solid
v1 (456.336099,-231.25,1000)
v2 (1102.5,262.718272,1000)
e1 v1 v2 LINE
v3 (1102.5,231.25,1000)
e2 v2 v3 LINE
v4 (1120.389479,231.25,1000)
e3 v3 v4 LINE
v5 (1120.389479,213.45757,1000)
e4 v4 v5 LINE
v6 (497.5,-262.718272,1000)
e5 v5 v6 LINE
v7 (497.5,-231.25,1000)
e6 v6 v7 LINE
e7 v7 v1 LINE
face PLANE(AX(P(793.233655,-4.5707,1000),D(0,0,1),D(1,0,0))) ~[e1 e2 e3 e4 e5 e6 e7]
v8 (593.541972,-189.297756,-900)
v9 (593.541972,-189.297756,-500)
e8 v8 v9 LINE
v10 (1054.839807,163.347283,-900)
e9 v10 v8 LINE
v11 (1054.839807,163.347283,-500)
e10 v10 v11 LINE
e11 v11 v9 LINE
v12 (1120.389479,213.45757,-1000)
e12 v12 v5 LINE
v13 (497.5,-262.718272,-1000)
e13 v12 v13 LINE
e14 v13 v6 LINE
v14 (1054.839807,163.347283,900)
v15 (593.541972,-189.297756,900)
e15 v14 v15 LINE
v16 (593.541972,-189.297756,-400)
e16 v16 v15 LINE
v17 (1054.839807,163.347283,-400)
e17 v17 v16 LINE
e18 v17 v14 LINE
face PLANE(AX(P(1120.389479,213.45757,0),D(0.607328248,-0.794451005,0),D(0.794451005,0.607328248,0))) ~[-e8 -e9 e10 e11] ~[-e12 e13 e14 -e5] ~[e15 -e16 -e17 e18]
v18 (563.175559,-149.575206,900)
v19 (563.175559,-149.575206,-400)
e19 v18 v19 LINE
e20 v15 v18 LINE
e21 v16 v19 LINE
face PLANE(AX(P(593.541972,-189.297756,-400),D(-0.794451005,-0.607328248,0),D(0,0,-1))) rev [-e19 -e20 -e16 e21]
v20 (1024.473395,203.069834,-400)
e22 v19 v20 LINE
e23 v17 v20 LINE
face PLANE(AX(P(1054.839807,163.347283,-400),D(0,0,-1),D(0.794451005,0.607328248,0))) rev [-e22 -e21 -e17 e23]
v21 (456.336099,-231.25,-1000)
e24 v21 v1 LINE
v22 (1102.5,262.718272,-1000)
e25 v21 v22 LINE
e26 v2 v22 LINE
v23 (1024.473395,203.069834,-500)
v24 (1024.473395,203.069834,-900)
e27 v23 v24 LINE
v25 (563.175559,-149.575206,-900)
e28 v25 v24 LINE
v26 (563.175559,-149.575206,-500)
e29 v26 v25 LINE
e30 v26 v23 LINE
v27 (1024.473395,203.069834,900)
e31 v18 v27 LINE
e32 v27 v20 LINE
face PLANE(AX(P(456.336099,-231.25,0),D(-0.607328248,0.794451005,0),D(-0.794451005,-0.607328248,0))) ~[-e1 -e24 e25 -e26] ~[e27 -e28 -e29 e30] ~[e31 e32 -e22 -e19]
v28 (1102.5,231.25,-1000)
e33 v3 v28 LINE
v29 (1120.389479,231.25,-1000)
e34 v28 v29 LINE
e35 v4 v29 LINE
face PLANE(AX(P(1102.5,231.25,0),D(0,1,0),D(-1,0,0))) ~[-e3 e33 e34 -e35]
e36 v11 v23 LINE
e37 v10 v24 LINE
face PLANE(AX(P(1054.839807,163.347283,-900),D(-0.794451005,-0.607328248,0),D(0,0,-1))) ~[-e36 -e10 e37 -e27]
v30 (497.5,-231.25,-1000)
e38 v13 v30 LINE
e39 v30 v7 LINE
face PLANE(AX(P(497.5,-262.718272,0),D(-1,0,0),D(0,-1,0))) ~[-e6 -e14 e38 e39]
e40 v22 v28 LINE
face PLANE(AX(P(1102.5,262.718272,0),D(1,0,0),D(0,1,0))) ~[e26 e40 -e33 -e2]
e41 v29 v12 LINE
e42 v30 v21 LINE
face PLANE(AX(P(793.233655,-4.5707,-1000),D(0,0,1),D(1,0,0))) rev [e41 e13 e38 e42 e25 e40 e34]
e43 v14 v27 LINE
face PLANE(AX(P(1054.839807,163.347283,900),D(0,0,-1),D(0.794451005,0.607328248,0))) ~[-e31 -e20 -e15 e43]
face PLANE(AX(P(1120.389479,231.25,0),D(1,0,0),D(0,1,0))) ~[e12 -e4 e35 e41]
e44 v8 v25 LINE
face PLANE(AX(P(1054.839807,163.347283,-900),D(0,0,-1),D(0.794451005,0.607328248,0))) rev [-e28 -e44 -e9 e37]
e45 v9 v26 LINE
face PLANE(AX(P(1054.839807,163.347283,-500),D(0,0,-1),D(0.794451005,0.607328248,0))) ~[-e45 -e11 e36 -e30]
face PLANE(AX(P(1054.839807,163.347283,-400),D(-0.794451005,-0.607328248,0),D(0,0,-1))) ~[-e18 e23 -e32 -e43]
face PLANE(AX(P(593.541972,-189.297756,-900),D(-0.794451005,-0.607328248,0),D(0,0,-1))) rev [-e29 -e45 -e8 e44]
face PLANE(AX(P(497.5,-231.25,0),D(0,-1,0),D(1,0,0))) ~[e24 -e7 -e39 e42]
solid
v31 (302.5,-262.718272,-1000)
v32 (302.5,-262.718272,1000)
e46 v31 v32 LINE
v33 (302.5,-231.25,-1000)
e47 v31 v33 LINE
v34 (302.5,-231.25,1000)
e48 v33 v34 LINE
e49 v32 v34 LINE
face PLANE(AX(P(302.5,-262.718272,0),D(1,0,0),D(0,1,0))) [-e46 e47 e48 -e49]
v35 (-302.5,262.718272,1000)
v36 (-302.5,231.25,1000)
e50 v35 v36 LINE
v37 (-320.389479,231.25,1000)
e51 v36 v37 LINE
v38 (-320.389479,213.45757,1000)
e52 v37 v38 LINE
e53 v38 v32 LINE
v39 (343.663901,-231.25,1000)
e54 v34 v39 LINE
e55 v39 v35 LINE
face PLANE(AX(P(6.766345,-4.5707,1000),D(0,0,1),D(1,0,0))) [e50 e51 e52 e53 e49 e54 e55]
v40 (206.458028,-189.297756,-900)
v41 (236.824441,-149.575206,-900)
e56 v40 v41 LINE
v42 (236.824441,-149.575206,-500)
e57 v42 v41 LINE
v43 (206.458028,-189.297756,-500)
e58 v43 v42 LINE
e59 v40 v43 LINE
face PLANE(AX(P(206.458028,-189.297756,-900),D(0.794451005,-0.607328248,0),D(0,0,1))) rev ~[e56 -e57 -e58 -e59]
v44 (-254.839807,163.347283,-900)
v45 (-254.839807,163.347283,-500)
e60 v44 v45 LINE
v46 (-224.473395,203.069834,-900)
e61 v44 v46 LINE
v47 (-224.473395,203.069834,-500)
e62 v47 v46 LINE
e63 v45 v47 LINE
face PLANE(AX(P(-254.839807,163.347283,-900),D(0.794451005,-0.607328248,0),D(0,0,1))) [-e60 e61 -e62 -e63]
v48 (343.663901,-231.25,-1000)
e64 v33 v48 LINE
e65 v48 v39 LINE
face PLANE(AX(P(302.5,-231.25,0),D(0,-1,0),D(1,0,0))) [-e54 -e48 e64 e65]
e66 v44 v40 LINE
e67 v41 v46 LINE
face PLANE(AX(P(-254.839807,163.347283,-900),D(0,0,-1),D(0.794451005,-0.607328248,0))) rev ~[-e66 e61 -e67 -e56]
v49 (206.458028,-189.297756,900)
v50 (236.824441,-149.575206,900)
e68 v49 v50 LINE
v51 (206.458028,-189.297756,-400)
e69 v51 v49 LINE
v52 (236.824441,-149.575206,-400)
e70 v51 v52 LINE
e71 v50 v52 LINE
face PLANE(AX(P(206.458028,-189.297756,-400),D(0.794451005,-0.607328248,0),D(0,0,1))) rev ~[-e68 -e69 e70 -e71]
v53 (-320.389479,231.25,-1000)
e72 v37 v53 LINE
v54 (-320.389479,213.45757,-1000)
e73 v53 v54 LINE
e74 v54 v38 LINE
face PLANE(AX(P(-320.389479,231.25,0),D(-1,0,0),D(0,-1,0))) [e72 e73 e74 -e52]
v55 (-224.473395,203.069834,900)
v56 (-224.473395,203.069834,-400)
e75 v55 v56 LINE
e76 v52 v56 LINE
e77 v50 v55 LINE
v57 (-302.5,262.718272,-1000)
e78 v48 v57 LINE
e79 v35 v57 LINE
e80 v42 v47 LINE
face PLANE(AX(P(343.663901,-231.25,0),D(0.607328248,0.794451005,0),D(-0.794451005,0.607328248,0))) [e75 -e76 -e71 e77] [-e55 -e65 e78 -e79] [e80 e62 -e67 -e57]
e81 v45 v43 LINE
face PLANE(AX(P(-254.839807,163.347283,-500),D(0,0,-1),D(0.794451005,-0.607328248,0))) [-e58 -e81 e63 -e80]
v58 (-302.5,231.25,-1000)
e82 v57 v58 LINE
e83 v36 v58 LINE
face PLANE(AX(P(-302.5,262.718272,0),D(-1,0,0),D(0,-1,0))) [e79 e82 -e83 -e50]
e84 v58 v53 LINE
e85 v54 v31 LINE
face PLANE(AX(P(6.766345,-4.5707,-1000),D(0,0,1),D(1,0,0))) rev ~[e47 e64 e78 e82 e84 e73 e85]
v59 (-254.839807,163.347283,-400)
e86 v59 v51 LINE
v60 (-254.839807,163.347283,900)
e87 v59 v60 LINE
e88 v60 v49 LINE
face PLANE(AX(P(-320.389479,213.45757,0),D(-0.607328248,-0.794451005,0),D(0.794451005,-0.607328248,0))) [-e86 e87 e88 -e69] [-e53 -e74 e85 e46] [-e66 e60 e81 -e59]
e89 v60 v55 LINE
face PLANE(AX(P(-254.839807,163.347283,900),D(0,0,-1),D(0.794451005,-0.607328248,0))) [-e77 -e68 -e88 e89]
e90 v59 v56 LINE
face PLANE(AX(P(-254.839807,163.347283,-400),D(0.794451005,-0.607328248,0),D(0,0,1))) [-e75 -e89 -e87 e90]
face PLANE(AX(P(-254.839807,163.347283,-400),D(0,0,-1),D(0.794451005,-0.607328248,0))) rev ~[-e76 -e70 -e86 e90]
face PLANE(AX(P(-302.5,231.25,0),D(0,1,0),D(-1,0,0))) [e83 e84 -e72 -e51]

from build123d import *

# Parameters (mm, degrees)
F1_DEPTH      = 1000
F1_DEPTH_BACK = 1000
F3_W          = 580.6498229504
F3_H          = 1300
F3_H_2        = 400
F4_DEPTH      = 442.4345898662


with BuildPart() as f1:
    # F0 (on Top) → F1 (new body, two sides)
    with BuildSketch(Plane.XY) as f1_sk:
        Polygon((-320.3894793987, 231.25), (-320.3894793987, 213.4575700915), (302.5, -262.7182715976), (302.5, -231.25), (343.663901225, -231.25), (-281.9180493875, 246.9841357988), (-302.5, 262.7182715976), (-302.5, 231.25), align=None)
    extrude(amount=F1_DEPTH)
    extrude(f1_sk.sketch, amount=-F1_DEPTH_BACK)

    # F3 (on face) → F4 (cut, through all)
    with BuildSketch(Plane(origin=(-15.1832061928, -19.8612751279, 0), x_dir=(0.7944510051, -0.6073282477, 0), z_dir=(-0.6073282477, -0.7944510051, 0))):
        with Locations((-11.3382488489, 250)):
            Rectangle(F3_W, F3_H)
        with Locations((-11.3382488489, -700)):
            Rectangle(F3_W, F3_H_2)
    extrude(amount=-F4_DEPTH, mode=Mode.SUBTRACT)


with BuildPart() as f6_1:
    # F6: instance of F1
    add(f1.part.mirror(Plane.YZ.offset(400)))


solid = Compound([f1.part, f6_1.part])
